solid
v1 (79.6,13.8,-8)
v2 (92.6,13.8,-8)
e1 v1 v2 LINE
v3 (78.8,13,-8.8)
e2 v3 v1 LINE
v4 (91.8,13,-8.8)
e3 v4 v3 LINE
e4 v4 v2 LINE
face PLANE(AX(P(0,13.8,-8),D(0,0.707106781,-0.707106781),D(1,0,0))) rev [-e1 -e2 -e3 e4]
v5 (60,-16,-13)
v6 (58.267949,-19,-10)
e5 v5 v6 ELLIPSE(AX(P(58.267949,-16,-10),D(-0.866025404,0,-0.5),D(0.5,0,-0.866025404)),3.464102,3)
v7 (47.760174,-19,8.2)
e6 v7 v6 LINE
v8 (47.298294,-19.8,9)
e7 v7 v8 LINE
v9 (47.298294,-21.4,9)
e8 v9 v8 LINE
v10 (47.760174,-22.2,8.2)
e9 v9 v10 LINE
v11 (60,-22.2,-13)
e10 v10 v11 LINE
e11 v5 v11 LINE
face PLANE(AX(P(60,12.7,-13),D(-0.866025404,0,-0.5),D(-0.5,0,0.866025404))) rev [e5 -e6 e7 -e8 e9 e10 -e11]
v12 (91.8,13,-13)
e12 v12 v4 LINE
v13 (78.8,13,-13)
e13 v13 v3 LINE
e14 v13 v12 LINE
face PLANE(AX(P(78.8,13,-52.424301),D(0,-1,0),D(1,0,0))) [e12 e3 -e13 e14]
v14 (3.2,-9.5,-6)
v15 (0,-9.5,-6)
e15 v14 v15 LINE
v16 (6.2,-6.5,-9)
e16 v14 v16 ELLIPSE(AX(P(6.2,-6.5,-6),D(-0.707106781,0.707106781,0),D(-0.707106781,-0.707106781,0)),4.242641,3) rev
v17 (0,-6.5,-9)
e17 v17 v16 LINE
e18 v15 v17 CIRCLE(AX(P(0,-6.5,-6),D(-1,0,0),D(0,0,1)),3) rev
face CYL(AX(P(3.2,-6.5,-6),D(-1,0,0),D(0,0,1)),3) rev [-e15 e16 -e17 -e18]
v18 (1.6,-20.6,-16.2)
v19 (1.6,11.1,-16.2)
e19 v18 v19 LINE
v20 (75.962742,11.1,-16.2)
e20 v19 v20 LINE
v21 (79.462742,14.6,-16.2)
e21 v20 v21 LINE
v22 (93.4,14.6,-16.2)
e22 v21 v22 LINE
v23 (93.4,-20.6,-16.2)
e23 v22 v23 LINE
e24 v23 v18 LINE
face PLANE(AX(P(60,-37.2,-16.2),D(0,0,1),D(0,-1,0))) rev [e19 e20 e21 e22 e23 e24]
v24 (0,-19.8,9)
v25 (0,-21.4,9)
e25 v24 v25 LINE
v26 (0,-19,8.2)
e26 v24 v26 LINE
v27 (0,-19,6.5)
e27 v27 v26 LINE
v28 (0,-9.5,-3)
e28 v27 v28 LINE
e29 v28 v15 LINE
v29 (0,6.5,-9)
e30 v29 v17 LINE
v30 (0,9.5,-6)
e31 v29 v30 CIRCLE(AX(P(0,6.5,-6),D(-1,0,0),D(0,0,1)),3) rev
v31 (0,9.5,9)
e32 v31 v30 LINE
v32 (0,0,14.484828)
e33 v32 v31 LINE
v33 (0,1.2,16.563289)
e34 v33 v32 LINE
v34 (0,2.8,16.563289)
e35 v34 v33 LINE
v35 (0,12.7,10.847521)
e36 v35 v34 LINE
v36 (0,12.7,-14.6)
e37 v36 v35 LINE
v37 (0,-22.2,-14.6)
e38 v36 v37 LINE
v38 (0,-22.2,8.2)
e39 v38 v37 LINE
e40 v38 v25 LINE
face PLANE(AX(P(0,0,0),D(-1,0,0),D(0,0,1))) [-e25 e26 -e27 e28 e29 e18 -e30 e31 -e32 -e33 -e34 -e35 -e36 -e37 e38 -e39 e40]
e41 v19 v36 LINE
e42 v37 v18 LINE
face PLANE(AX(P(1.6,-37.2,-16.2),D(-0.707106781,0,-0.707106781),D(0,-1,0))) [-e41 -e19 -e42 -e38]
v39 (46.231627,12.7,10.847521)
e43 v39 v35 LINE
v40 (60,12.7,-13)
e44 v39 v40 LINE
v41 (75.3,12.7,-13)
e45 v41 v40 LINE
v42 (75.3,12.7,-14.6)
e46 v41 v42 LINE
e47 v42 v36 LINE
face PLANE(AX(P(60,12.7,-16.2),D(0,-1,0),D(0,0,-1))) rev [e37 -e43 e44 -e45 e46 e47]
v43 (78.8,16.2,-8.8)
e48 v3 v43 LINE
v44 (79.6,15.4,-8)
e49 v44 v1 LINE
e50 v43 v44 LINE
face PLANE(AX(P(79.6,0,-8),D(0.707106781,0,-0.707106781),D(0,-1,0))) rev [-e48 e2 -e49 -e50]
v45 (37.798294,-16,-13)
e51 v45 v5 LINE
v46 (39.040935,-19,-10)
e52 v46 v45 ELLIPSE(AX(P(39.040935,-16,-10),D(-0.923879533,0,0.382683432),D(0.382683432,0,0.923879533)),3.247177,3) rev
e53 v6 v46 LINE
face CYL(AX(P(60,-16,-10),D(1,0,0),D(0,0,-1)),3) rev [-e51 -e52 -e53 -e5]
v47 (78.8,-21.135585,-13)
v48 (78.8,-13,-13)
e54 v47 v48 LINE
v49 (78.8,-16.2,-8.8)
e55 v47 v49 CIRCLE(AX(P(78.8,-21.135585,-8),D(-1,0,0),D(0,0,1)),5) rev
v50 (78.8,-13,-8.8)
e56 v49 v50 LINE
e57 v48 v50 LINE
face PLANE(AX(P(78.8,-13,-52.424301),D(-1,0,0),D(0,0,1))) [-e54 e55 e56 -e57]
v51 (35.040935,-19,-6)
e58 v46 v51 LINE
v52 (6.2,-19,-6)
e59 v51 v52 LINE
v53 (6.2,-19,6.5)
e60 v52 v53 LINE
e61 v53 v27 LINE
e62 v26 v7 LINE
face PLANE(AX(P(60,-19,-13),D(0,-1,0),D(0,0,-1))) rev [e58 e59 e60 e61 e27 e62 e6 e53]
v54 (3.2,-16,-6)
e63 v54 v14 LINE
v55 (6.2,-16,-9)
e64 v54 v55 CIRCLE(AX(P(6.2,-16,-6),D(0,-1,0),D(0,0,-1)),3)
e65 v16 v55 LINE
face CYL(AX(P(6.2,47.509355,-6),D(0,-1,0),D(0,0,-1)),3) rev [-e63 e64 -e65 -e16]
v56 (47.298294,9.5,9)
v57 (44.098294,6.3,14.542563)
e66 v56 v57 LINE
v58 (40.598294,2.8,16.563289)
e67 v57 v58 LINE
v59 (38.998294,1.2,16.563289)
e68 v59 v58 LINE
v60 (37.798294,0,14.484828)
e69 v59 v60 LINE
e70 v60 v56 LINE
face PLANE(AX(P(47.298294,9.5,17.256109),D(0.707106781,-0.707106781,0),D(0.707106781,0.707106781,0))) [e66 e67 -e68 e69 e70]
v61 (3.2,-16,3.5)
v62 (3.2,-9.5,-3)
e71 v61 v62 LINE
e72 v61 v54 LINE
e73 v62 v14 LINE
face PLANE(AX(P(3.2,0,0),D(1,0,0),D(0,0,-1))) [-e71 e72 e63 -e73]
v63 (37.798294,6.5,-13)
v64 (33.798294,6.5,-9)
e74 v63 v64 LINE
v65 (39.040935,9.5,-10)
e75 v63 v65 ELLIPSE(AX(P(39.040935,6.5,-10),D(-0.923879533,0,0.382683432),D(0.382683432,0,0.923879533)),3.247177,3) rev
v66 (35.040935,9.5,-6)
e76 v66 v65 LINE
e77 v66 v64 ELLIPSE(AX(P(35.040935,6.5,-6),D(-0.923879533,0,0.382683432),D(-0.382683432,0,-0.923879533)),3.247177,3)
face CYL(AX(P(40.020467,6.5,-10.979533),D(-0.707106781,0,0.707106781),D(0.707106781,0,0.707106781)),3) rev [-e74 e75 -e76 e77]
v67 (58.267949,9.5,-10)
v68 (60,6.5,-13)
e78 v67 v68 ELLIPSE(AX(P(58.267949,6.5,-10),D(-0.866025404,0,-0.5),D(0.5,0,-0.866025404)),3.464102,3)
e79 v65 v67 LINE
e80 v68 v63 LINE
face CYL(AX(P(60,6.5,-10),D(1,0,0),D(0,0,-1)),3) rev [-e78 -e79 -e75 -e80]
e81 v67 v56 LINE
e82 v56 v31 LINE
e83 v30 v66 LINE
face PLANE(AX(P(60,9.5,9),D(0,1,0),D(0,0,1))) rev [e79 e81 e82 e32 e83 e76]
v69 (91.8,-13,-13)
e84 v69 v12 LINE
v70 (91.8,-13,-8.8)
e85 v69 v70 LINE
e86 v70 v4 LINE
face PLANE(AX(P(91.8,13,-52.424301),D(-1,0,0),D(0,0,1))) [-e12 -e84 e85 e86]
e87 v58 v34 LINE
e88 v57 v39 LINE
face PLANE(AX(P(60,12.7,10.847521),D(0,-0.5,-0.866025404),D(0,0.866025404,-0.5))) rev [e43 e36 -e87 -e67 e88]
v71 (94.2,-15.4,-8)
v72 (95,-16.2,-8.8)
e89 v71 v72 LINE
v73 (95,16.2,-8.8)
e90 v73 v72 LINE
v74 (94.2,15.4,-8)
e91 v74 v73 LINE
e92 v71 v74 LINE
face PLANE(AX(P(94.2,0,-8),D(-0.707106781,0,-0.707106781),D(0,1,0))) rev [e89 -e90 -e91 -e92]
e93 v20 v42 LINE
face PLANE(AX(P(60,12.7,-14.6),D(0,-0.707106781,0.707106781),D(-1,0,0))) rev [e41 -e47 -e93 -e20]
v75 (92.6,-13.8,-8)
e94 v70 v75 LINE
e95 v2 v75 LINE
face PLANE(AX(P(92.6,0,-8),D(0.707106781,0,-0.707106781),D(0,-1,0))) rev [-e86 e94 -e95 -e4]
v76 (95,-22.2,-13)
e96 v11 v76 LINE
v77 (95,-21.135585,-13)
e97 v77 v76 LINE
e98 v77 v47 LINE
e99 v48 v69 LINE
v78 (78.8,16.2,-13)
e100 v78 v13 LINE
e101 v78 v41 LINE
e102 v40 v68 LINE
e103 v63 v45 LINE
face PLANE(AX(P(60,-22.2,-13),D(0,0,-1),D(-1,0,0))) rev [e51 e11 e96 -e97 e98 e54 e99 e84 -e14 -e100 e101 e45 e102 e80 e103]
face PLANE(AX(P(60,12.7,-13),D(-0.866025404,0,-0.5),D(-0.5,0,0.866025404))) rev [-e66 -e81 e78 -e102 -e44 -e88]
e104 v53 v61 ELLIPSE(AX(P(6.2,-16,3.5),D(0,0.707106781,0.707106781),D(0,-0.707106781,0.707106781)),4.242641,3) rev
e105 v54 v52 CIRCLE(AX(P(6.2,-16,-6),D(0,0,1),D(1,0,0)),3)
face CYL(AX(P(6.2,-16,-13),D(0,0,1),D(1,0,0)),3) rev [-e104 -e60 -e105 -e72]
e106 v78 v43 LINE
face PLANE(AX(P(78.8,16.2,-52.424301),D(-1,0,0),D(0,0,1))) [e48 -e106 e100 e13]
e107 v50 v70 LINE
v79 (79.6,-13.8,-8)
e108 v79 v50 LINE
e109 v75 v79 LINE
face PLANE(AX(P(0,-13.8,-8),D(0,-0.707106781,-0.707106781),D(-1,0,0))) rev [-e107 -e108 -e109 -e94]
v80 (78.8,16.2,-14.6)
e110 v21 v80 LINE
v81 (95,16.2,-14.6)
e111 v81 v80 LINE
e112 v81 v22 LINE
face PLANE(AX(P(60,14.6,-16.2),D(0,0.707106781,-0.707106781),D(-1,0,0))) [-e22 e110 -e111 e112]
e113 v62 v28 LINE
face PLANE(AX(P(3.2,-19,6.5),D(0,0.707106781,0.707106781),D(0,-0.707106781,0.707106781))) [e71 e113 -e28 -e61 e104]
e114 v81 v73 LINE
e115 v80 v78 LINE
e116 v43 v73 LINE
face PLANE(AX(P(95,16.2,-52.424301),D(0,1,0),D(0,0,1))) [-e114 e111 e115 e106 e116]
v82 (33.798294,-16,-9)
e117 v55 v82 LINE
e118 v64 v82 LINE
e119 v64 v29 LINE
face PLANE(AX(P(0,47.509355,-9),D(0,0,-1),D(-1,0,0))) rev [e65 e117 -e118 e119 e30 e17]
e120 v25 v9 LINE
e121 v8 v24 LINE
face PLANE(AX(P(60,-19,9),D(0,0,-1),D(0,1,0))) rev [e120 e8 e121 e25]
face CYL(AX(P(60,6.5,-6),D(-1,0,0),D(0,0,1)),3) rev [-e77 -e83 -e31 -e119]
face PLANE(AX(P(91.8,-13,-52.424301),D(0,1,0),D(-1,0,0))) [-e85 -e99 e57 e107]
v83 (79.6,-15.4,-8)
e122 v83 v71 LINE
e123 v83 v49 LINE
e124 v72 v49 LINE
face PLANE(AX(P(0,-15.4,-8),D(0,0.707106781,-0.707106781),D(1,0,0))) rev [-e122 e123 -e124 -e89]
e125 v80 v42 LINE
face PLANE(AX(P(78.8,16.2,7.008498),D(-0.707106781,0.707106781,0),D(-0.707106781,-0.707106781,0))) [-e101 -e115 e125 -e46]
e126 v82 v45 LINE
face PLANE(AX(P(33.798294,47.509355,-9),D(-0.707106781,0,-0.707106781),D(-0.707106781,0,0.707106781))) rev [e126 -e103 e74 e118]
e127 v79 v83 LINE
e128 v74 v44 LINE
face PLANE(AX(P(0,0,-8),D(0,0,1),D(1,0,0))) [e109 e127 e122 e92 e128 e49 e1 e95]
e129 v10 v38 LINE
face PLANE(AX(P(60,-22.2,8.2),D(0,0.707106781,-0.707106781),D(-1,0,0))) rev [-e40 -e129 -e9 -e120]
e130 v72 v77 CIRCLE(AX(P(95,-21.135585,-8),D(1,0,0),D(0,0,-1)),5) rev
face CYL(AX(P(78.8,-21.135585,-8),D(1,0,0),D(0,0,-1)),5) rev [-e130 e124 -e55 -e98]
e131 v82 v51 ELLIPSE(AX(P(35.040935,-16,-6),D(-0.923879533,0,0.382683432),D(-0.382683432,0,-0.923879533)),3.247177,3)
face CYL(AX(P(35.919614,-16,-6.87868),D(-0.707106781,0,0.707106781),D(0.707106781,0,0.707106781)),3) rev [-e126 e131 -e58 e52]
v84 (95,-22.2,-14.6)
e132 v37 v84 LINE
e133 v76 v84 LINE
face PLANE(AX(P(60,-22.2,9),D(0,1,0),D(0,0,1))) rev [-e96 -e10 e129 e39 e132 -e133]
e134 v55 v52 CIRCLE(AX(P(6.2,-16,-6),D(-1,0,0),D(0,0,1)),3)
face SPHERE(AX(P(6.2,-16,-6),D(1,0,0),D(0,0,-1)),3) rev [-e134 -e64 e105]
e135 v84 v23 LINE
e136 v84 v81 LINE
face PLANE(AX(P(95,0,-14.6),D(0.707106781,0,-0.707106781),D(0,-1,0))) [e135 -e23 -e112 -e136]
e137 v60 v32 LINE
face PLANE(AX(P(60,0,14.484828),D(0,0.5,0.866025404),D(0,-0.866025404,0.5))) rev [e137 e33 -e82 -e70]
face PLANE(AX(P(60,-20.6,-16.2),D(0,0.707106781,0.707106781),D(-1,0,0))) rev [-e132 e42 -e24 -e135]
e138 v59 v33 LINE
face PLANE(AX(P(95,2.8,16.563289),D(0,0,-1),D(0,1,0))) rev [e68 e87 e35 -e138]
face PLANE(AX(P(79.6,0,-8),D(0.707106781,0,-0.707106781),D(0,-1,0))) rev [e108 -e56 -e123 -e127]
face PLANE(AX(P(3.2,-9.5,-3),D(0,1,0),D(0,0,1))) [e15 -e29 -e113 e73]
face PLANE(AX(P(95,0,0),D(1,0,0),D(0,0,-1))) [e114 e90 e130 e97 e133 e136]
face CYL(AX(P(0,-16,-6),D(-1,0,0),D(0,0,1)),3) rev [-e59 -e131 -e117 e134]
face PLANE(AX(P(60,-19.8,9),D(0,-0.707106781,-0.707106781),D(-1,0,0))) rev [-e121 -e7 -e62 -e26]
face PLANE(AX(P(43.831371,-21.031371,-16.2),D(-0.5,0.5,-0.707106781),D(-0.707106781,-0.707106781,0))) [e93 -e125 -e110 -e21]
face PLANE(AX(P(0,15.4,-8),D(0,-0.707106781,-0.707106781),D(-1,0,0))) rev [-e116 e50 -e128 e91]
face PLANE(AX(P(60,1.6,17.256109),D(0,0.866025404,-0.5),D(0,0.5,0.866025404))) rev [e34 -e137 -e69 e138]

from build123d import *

# Parameters (mm, degrees)
BOSS_EXTRUDE1_DEPTH             = 60
BOSS_EXTRUDE2_DEPTH             = 35
CUT_EXTRUDE1_DEPTH              = 103.668316888
CUT_EXTRUDE2_DEPTH              = 113.568195388
CUT_EXTRUDE3_DEPTH              = 112.060037393
BOSS_EXTRUDE3_DEPTH             = 5
BOSS_EXTRUDE3_DIRECTION_2_REACH = 115.625
BOSS_EXTRUDE4_DEPTH             = 3.2
BOSS_EXTRUDE5_DEPTH             = 28.5
BOSS_EXTRUDE6_DEPTH             = 3.2
SKETCH8_W                       = 25.2
SKETCH8_H                       = 32.67766953
CUT_EXTRUDE4_DEPTH              = 111.954500313
CHAMFER1_SIZE                   = 0.8
FILLET1_R                       = 5
FILLET2_R                       = 3
FILLET3_R                       = 3
CHAMFER2_SIZE                   = 1.6
CHAMFER3_SIZE                   = 0.8


with BuildPart() as part:
    # Sketch1 → Boss-Extrude1 (new body)
    with BuildSketch(Plane(origin=(0, 0, 0), x_dir=(0, 0, -1), z_dir=(1, 0, 0))):
        Polygon((-9, 9.5), (13, 9.5), (13, -19), (-9, -19), (-9, -22.2), (13, -22.2), (13, -37.2), (-3.07766953, -53.27766953), (-1.47766953, -54.87766953), (16.2, -37.2), (16.2, 12.7), (-10.847520861, 12.7), (-17.256108849, 1.6), (-14.484827557, 0), align=None)
    extrude(amount=BOSS_EXTRUDE1_DEPTH)

    # Sketch2 → Boss-Extrude2 (add)
    with BuildSketch(Plane(origin=(60, 0, 0), x_dir=(0, 0, -1), z_dir=(1, 0, 0))):
        Polygon((-3.07766953, -53.27766953), (-1.47766953, -54.87766953), (16.2, -37.2), (16.2, 12.7), (13, 12.7), (13, -37.2), align=None)
    extrude(amount=BOSS_EXTRUDE2_DEPTH)

    # Sketch3 → Cut-Extrude1 (cut, through all)
    with BuildSketch(Plane.XZ.offset(22.2)):
        Polygon((60, -13), (42.531627411, 17.256108849), (60, 17.256108849), align=None)
    extrude(amount=-CUT_EXTRUDE1_DEPTH, mode=Mode.SUBTRACT)

    # Sketch4 → Cut-Extrude2 (cut, through all)
    with BuildSketch(Plane.XY.offset(9)):
        Polygon((47.298294078, 9.5), (37.798294078, 0), (47.298294078, 0), align=None)
    extrude(amount=CUT_EXTRUDE2_DEPTH, mode=Mode.SUBTRACT)

    # Sketch5 → Cut-Extrude3 (cut, through all)
    with BuildSketch(Plane.ZY):
        Polygon((16.563288526, 2.8), (16.563288526, 1.2), (17.256108849, 1.6), align=None)
        Polygon((2.27766953, -52.47766953), (2.27766953, -54.07766953), (3.07766953, -53.27766953), align=None)
    extrude(amount=-CUT_EXTRUDE3_DEPTH, mode=Mode.SUBTRACT)

    # Sketch6 → Boss-Extrude3 (add)
    with BuildSketch(Plane.XY.offset(-13)):
        Polygon((78.8, 13), (91.8, 13), (91.8, -13), (78.8, -13), (78.8, -16.2), (95, -16.2), (95, 16.2), (78.8, 16.2), align=None)
    extrude(amount=BOSS_EXTRUDE3_DEPTH)

    # Boss-Extrude3 direction 2: up to this face of the body (flat: up to its plane)
    boss_extrude3_direction_2_end = Plane(part.part.faces().sort_by_distance((47.5, -12.25, -16.2))[0])
    # Sketch6 → Boss-Extrude3 direction 2 (add, up to the picked face)
    with BuildSketch(Plane.XY.offset(-13), mode=Mode.PRIVATE) as boss_extrude3_direction_2_sk1:
        Polygon((78.8, 13), (91.8, 13), (91.8, -13), (78.8, -13), (78.8, -16.2), (95, -16.2), (95, 16.2), (78.8, 16.2), align=None)
    boss_extrude3_direction_2_tool1 = split(extrude(boss_extrude3_direction_2_sk1.sketch, amount=-BOSS_EXTRUDE3_DIRECTION_2_REACH, mode=Mode.PRIVATE), bisect_by=boss_extrude3_direction_2_end, keep=Keep.BOTH, mode=Mode.PRIVATE)
    add(boss_extrude3_direction_2_tool1.solids().sort_by(Axis((85.3, 13.362243, -13), (0, 0, -1)))[0])

    # Sketch7 → Boss-Extrude4 (add)
    with BuildSketch(Plane(origin=(0, 0, -16.2), x_dir=(-1, 0, 0), z_dir=(0, 0, -1))):
        Polygon((-95, 16.2), (-78.8, 16.2), (-75.3, 12.7), (-95, 12.7), align=None)
    extrude(amount=-BOSS_EXTRUDE4_DEPTH)

    # Sketch9 → Boss-Extrude5 (add)
    with BuildSketch(Plane(origin=(0, -19, 0), x_dir=(1, 0, 0), z_dir=(0, 1, 0))):
        Polygon((33.798294078, 9), (37.798294078, 13), (0, 13), (0, 9), align=None)
    extrude(amount=BOSS_EXTRUDE5_DEPTH)

    # Sketch10 → Boss-Extrude6 (add)
    with BuildSketch(Plane.ZY):
        Polygon((6.5, -19), (-3, -9.5), (-9, -9.5), (-9, -19), align=None)
    extrude(amount=-BOSS_EXTRUDE6_DEPTH)

    # Sketch8 → Cut-Extrude4 (cut, through all)
    with BuildSketch(Plane.ZY):
        with Locations((-3.6, -38.538834765)):
            Rectangle(SKETCH8_W, SKETCH8_H)
    extrude(amount=-CUT_EXTRUDE4_DEPTH, mode=Mode.SUBTRACT)

    # Chamfer1
    chamfer1_edges = [part.edges().sort_by_distance(p)[0] for p in [
        (78.8, 14.6, -8),
        (85.3, 13, -8),
        (91.8, 0, -8),
        (85.3, -13, -8),
        (78.8, -14.6, -8),
        (86.9, -16.2, -8),
        (95, 0, -8),
        (86.9, 16.2, -8),
    ]]
    chamfer(chamfer1_edges, length=CHAMFER1_SIZE)

    # Fillet1
    # the kernel refuses this fillet: 5 mm, written as the material it adds along each edge
    with BuildSketch(Plane(origin=(78.8, -16.2, -13), x_dir=(0, 0, 1), z_dir=(1, 0, 0))) as fillet1_piece_1:
        with BuildLine():
            CenterArc((5, 4.935585072), FILLET1_R, 180, 80.793103779)
            Line((0, 4.935585072), (0, 0))
            Line((0, 0), (4.2, 0))
        make_face()
    extrude(amount=16.2)

    # Fillet2
    fillet2_edges = [part.edges().sort_by_distance(p)[0] for p in [
        (35.798294078, -19, -11),
        (16.899147039, 9.5, -9),
        (35.798294078, 9.5, -11),
        (18.499147039, -19, -9),
        (1.6, -9.5, -9),
        (48.899147039, 9.5, -13),
        (48.899147039, -19, -13),
    ]]
    fillet(fillet2_edges, radius=FILLET2_R)

    # Fillet3
    fillet3_edges = [part.edges().sort_by_distance(p)[0] for p in [
        (3.2, -19, 0.25),
        (3.2, -11.25, -9),
        (3.2, -18.121320344, -8.121320344),
    ]]
    fillet(fillet3_edges, radius=FILLET3_R)

    # Chamfer2
    chamfer2_edges = [part.edges().sort_by_distance(p)[0] for p in [
        (86.9, 16.2, -16.2),
        (37.65, 12.7, -16.2),
        (77.05, 14.45, -16.2),
        (95, -3, -16.2),
        (0, -4.75, -16.2),
        (47.5, -22.2, -16.2),
    ]]
    chamfer(chamfer2_edges, length=CHAMFER2_SIZE)

    # Chamfer3
    chamfer3_edges = [part.edges().sort_by_distance(p)[0] for p in [
        (23.649147039, -22.2, 9),
        (23.649147039, -19, 9),
    ]]
    chamfer(chamfer3_edges, length=CHAMFER3_SIZE)


solid = part.part
